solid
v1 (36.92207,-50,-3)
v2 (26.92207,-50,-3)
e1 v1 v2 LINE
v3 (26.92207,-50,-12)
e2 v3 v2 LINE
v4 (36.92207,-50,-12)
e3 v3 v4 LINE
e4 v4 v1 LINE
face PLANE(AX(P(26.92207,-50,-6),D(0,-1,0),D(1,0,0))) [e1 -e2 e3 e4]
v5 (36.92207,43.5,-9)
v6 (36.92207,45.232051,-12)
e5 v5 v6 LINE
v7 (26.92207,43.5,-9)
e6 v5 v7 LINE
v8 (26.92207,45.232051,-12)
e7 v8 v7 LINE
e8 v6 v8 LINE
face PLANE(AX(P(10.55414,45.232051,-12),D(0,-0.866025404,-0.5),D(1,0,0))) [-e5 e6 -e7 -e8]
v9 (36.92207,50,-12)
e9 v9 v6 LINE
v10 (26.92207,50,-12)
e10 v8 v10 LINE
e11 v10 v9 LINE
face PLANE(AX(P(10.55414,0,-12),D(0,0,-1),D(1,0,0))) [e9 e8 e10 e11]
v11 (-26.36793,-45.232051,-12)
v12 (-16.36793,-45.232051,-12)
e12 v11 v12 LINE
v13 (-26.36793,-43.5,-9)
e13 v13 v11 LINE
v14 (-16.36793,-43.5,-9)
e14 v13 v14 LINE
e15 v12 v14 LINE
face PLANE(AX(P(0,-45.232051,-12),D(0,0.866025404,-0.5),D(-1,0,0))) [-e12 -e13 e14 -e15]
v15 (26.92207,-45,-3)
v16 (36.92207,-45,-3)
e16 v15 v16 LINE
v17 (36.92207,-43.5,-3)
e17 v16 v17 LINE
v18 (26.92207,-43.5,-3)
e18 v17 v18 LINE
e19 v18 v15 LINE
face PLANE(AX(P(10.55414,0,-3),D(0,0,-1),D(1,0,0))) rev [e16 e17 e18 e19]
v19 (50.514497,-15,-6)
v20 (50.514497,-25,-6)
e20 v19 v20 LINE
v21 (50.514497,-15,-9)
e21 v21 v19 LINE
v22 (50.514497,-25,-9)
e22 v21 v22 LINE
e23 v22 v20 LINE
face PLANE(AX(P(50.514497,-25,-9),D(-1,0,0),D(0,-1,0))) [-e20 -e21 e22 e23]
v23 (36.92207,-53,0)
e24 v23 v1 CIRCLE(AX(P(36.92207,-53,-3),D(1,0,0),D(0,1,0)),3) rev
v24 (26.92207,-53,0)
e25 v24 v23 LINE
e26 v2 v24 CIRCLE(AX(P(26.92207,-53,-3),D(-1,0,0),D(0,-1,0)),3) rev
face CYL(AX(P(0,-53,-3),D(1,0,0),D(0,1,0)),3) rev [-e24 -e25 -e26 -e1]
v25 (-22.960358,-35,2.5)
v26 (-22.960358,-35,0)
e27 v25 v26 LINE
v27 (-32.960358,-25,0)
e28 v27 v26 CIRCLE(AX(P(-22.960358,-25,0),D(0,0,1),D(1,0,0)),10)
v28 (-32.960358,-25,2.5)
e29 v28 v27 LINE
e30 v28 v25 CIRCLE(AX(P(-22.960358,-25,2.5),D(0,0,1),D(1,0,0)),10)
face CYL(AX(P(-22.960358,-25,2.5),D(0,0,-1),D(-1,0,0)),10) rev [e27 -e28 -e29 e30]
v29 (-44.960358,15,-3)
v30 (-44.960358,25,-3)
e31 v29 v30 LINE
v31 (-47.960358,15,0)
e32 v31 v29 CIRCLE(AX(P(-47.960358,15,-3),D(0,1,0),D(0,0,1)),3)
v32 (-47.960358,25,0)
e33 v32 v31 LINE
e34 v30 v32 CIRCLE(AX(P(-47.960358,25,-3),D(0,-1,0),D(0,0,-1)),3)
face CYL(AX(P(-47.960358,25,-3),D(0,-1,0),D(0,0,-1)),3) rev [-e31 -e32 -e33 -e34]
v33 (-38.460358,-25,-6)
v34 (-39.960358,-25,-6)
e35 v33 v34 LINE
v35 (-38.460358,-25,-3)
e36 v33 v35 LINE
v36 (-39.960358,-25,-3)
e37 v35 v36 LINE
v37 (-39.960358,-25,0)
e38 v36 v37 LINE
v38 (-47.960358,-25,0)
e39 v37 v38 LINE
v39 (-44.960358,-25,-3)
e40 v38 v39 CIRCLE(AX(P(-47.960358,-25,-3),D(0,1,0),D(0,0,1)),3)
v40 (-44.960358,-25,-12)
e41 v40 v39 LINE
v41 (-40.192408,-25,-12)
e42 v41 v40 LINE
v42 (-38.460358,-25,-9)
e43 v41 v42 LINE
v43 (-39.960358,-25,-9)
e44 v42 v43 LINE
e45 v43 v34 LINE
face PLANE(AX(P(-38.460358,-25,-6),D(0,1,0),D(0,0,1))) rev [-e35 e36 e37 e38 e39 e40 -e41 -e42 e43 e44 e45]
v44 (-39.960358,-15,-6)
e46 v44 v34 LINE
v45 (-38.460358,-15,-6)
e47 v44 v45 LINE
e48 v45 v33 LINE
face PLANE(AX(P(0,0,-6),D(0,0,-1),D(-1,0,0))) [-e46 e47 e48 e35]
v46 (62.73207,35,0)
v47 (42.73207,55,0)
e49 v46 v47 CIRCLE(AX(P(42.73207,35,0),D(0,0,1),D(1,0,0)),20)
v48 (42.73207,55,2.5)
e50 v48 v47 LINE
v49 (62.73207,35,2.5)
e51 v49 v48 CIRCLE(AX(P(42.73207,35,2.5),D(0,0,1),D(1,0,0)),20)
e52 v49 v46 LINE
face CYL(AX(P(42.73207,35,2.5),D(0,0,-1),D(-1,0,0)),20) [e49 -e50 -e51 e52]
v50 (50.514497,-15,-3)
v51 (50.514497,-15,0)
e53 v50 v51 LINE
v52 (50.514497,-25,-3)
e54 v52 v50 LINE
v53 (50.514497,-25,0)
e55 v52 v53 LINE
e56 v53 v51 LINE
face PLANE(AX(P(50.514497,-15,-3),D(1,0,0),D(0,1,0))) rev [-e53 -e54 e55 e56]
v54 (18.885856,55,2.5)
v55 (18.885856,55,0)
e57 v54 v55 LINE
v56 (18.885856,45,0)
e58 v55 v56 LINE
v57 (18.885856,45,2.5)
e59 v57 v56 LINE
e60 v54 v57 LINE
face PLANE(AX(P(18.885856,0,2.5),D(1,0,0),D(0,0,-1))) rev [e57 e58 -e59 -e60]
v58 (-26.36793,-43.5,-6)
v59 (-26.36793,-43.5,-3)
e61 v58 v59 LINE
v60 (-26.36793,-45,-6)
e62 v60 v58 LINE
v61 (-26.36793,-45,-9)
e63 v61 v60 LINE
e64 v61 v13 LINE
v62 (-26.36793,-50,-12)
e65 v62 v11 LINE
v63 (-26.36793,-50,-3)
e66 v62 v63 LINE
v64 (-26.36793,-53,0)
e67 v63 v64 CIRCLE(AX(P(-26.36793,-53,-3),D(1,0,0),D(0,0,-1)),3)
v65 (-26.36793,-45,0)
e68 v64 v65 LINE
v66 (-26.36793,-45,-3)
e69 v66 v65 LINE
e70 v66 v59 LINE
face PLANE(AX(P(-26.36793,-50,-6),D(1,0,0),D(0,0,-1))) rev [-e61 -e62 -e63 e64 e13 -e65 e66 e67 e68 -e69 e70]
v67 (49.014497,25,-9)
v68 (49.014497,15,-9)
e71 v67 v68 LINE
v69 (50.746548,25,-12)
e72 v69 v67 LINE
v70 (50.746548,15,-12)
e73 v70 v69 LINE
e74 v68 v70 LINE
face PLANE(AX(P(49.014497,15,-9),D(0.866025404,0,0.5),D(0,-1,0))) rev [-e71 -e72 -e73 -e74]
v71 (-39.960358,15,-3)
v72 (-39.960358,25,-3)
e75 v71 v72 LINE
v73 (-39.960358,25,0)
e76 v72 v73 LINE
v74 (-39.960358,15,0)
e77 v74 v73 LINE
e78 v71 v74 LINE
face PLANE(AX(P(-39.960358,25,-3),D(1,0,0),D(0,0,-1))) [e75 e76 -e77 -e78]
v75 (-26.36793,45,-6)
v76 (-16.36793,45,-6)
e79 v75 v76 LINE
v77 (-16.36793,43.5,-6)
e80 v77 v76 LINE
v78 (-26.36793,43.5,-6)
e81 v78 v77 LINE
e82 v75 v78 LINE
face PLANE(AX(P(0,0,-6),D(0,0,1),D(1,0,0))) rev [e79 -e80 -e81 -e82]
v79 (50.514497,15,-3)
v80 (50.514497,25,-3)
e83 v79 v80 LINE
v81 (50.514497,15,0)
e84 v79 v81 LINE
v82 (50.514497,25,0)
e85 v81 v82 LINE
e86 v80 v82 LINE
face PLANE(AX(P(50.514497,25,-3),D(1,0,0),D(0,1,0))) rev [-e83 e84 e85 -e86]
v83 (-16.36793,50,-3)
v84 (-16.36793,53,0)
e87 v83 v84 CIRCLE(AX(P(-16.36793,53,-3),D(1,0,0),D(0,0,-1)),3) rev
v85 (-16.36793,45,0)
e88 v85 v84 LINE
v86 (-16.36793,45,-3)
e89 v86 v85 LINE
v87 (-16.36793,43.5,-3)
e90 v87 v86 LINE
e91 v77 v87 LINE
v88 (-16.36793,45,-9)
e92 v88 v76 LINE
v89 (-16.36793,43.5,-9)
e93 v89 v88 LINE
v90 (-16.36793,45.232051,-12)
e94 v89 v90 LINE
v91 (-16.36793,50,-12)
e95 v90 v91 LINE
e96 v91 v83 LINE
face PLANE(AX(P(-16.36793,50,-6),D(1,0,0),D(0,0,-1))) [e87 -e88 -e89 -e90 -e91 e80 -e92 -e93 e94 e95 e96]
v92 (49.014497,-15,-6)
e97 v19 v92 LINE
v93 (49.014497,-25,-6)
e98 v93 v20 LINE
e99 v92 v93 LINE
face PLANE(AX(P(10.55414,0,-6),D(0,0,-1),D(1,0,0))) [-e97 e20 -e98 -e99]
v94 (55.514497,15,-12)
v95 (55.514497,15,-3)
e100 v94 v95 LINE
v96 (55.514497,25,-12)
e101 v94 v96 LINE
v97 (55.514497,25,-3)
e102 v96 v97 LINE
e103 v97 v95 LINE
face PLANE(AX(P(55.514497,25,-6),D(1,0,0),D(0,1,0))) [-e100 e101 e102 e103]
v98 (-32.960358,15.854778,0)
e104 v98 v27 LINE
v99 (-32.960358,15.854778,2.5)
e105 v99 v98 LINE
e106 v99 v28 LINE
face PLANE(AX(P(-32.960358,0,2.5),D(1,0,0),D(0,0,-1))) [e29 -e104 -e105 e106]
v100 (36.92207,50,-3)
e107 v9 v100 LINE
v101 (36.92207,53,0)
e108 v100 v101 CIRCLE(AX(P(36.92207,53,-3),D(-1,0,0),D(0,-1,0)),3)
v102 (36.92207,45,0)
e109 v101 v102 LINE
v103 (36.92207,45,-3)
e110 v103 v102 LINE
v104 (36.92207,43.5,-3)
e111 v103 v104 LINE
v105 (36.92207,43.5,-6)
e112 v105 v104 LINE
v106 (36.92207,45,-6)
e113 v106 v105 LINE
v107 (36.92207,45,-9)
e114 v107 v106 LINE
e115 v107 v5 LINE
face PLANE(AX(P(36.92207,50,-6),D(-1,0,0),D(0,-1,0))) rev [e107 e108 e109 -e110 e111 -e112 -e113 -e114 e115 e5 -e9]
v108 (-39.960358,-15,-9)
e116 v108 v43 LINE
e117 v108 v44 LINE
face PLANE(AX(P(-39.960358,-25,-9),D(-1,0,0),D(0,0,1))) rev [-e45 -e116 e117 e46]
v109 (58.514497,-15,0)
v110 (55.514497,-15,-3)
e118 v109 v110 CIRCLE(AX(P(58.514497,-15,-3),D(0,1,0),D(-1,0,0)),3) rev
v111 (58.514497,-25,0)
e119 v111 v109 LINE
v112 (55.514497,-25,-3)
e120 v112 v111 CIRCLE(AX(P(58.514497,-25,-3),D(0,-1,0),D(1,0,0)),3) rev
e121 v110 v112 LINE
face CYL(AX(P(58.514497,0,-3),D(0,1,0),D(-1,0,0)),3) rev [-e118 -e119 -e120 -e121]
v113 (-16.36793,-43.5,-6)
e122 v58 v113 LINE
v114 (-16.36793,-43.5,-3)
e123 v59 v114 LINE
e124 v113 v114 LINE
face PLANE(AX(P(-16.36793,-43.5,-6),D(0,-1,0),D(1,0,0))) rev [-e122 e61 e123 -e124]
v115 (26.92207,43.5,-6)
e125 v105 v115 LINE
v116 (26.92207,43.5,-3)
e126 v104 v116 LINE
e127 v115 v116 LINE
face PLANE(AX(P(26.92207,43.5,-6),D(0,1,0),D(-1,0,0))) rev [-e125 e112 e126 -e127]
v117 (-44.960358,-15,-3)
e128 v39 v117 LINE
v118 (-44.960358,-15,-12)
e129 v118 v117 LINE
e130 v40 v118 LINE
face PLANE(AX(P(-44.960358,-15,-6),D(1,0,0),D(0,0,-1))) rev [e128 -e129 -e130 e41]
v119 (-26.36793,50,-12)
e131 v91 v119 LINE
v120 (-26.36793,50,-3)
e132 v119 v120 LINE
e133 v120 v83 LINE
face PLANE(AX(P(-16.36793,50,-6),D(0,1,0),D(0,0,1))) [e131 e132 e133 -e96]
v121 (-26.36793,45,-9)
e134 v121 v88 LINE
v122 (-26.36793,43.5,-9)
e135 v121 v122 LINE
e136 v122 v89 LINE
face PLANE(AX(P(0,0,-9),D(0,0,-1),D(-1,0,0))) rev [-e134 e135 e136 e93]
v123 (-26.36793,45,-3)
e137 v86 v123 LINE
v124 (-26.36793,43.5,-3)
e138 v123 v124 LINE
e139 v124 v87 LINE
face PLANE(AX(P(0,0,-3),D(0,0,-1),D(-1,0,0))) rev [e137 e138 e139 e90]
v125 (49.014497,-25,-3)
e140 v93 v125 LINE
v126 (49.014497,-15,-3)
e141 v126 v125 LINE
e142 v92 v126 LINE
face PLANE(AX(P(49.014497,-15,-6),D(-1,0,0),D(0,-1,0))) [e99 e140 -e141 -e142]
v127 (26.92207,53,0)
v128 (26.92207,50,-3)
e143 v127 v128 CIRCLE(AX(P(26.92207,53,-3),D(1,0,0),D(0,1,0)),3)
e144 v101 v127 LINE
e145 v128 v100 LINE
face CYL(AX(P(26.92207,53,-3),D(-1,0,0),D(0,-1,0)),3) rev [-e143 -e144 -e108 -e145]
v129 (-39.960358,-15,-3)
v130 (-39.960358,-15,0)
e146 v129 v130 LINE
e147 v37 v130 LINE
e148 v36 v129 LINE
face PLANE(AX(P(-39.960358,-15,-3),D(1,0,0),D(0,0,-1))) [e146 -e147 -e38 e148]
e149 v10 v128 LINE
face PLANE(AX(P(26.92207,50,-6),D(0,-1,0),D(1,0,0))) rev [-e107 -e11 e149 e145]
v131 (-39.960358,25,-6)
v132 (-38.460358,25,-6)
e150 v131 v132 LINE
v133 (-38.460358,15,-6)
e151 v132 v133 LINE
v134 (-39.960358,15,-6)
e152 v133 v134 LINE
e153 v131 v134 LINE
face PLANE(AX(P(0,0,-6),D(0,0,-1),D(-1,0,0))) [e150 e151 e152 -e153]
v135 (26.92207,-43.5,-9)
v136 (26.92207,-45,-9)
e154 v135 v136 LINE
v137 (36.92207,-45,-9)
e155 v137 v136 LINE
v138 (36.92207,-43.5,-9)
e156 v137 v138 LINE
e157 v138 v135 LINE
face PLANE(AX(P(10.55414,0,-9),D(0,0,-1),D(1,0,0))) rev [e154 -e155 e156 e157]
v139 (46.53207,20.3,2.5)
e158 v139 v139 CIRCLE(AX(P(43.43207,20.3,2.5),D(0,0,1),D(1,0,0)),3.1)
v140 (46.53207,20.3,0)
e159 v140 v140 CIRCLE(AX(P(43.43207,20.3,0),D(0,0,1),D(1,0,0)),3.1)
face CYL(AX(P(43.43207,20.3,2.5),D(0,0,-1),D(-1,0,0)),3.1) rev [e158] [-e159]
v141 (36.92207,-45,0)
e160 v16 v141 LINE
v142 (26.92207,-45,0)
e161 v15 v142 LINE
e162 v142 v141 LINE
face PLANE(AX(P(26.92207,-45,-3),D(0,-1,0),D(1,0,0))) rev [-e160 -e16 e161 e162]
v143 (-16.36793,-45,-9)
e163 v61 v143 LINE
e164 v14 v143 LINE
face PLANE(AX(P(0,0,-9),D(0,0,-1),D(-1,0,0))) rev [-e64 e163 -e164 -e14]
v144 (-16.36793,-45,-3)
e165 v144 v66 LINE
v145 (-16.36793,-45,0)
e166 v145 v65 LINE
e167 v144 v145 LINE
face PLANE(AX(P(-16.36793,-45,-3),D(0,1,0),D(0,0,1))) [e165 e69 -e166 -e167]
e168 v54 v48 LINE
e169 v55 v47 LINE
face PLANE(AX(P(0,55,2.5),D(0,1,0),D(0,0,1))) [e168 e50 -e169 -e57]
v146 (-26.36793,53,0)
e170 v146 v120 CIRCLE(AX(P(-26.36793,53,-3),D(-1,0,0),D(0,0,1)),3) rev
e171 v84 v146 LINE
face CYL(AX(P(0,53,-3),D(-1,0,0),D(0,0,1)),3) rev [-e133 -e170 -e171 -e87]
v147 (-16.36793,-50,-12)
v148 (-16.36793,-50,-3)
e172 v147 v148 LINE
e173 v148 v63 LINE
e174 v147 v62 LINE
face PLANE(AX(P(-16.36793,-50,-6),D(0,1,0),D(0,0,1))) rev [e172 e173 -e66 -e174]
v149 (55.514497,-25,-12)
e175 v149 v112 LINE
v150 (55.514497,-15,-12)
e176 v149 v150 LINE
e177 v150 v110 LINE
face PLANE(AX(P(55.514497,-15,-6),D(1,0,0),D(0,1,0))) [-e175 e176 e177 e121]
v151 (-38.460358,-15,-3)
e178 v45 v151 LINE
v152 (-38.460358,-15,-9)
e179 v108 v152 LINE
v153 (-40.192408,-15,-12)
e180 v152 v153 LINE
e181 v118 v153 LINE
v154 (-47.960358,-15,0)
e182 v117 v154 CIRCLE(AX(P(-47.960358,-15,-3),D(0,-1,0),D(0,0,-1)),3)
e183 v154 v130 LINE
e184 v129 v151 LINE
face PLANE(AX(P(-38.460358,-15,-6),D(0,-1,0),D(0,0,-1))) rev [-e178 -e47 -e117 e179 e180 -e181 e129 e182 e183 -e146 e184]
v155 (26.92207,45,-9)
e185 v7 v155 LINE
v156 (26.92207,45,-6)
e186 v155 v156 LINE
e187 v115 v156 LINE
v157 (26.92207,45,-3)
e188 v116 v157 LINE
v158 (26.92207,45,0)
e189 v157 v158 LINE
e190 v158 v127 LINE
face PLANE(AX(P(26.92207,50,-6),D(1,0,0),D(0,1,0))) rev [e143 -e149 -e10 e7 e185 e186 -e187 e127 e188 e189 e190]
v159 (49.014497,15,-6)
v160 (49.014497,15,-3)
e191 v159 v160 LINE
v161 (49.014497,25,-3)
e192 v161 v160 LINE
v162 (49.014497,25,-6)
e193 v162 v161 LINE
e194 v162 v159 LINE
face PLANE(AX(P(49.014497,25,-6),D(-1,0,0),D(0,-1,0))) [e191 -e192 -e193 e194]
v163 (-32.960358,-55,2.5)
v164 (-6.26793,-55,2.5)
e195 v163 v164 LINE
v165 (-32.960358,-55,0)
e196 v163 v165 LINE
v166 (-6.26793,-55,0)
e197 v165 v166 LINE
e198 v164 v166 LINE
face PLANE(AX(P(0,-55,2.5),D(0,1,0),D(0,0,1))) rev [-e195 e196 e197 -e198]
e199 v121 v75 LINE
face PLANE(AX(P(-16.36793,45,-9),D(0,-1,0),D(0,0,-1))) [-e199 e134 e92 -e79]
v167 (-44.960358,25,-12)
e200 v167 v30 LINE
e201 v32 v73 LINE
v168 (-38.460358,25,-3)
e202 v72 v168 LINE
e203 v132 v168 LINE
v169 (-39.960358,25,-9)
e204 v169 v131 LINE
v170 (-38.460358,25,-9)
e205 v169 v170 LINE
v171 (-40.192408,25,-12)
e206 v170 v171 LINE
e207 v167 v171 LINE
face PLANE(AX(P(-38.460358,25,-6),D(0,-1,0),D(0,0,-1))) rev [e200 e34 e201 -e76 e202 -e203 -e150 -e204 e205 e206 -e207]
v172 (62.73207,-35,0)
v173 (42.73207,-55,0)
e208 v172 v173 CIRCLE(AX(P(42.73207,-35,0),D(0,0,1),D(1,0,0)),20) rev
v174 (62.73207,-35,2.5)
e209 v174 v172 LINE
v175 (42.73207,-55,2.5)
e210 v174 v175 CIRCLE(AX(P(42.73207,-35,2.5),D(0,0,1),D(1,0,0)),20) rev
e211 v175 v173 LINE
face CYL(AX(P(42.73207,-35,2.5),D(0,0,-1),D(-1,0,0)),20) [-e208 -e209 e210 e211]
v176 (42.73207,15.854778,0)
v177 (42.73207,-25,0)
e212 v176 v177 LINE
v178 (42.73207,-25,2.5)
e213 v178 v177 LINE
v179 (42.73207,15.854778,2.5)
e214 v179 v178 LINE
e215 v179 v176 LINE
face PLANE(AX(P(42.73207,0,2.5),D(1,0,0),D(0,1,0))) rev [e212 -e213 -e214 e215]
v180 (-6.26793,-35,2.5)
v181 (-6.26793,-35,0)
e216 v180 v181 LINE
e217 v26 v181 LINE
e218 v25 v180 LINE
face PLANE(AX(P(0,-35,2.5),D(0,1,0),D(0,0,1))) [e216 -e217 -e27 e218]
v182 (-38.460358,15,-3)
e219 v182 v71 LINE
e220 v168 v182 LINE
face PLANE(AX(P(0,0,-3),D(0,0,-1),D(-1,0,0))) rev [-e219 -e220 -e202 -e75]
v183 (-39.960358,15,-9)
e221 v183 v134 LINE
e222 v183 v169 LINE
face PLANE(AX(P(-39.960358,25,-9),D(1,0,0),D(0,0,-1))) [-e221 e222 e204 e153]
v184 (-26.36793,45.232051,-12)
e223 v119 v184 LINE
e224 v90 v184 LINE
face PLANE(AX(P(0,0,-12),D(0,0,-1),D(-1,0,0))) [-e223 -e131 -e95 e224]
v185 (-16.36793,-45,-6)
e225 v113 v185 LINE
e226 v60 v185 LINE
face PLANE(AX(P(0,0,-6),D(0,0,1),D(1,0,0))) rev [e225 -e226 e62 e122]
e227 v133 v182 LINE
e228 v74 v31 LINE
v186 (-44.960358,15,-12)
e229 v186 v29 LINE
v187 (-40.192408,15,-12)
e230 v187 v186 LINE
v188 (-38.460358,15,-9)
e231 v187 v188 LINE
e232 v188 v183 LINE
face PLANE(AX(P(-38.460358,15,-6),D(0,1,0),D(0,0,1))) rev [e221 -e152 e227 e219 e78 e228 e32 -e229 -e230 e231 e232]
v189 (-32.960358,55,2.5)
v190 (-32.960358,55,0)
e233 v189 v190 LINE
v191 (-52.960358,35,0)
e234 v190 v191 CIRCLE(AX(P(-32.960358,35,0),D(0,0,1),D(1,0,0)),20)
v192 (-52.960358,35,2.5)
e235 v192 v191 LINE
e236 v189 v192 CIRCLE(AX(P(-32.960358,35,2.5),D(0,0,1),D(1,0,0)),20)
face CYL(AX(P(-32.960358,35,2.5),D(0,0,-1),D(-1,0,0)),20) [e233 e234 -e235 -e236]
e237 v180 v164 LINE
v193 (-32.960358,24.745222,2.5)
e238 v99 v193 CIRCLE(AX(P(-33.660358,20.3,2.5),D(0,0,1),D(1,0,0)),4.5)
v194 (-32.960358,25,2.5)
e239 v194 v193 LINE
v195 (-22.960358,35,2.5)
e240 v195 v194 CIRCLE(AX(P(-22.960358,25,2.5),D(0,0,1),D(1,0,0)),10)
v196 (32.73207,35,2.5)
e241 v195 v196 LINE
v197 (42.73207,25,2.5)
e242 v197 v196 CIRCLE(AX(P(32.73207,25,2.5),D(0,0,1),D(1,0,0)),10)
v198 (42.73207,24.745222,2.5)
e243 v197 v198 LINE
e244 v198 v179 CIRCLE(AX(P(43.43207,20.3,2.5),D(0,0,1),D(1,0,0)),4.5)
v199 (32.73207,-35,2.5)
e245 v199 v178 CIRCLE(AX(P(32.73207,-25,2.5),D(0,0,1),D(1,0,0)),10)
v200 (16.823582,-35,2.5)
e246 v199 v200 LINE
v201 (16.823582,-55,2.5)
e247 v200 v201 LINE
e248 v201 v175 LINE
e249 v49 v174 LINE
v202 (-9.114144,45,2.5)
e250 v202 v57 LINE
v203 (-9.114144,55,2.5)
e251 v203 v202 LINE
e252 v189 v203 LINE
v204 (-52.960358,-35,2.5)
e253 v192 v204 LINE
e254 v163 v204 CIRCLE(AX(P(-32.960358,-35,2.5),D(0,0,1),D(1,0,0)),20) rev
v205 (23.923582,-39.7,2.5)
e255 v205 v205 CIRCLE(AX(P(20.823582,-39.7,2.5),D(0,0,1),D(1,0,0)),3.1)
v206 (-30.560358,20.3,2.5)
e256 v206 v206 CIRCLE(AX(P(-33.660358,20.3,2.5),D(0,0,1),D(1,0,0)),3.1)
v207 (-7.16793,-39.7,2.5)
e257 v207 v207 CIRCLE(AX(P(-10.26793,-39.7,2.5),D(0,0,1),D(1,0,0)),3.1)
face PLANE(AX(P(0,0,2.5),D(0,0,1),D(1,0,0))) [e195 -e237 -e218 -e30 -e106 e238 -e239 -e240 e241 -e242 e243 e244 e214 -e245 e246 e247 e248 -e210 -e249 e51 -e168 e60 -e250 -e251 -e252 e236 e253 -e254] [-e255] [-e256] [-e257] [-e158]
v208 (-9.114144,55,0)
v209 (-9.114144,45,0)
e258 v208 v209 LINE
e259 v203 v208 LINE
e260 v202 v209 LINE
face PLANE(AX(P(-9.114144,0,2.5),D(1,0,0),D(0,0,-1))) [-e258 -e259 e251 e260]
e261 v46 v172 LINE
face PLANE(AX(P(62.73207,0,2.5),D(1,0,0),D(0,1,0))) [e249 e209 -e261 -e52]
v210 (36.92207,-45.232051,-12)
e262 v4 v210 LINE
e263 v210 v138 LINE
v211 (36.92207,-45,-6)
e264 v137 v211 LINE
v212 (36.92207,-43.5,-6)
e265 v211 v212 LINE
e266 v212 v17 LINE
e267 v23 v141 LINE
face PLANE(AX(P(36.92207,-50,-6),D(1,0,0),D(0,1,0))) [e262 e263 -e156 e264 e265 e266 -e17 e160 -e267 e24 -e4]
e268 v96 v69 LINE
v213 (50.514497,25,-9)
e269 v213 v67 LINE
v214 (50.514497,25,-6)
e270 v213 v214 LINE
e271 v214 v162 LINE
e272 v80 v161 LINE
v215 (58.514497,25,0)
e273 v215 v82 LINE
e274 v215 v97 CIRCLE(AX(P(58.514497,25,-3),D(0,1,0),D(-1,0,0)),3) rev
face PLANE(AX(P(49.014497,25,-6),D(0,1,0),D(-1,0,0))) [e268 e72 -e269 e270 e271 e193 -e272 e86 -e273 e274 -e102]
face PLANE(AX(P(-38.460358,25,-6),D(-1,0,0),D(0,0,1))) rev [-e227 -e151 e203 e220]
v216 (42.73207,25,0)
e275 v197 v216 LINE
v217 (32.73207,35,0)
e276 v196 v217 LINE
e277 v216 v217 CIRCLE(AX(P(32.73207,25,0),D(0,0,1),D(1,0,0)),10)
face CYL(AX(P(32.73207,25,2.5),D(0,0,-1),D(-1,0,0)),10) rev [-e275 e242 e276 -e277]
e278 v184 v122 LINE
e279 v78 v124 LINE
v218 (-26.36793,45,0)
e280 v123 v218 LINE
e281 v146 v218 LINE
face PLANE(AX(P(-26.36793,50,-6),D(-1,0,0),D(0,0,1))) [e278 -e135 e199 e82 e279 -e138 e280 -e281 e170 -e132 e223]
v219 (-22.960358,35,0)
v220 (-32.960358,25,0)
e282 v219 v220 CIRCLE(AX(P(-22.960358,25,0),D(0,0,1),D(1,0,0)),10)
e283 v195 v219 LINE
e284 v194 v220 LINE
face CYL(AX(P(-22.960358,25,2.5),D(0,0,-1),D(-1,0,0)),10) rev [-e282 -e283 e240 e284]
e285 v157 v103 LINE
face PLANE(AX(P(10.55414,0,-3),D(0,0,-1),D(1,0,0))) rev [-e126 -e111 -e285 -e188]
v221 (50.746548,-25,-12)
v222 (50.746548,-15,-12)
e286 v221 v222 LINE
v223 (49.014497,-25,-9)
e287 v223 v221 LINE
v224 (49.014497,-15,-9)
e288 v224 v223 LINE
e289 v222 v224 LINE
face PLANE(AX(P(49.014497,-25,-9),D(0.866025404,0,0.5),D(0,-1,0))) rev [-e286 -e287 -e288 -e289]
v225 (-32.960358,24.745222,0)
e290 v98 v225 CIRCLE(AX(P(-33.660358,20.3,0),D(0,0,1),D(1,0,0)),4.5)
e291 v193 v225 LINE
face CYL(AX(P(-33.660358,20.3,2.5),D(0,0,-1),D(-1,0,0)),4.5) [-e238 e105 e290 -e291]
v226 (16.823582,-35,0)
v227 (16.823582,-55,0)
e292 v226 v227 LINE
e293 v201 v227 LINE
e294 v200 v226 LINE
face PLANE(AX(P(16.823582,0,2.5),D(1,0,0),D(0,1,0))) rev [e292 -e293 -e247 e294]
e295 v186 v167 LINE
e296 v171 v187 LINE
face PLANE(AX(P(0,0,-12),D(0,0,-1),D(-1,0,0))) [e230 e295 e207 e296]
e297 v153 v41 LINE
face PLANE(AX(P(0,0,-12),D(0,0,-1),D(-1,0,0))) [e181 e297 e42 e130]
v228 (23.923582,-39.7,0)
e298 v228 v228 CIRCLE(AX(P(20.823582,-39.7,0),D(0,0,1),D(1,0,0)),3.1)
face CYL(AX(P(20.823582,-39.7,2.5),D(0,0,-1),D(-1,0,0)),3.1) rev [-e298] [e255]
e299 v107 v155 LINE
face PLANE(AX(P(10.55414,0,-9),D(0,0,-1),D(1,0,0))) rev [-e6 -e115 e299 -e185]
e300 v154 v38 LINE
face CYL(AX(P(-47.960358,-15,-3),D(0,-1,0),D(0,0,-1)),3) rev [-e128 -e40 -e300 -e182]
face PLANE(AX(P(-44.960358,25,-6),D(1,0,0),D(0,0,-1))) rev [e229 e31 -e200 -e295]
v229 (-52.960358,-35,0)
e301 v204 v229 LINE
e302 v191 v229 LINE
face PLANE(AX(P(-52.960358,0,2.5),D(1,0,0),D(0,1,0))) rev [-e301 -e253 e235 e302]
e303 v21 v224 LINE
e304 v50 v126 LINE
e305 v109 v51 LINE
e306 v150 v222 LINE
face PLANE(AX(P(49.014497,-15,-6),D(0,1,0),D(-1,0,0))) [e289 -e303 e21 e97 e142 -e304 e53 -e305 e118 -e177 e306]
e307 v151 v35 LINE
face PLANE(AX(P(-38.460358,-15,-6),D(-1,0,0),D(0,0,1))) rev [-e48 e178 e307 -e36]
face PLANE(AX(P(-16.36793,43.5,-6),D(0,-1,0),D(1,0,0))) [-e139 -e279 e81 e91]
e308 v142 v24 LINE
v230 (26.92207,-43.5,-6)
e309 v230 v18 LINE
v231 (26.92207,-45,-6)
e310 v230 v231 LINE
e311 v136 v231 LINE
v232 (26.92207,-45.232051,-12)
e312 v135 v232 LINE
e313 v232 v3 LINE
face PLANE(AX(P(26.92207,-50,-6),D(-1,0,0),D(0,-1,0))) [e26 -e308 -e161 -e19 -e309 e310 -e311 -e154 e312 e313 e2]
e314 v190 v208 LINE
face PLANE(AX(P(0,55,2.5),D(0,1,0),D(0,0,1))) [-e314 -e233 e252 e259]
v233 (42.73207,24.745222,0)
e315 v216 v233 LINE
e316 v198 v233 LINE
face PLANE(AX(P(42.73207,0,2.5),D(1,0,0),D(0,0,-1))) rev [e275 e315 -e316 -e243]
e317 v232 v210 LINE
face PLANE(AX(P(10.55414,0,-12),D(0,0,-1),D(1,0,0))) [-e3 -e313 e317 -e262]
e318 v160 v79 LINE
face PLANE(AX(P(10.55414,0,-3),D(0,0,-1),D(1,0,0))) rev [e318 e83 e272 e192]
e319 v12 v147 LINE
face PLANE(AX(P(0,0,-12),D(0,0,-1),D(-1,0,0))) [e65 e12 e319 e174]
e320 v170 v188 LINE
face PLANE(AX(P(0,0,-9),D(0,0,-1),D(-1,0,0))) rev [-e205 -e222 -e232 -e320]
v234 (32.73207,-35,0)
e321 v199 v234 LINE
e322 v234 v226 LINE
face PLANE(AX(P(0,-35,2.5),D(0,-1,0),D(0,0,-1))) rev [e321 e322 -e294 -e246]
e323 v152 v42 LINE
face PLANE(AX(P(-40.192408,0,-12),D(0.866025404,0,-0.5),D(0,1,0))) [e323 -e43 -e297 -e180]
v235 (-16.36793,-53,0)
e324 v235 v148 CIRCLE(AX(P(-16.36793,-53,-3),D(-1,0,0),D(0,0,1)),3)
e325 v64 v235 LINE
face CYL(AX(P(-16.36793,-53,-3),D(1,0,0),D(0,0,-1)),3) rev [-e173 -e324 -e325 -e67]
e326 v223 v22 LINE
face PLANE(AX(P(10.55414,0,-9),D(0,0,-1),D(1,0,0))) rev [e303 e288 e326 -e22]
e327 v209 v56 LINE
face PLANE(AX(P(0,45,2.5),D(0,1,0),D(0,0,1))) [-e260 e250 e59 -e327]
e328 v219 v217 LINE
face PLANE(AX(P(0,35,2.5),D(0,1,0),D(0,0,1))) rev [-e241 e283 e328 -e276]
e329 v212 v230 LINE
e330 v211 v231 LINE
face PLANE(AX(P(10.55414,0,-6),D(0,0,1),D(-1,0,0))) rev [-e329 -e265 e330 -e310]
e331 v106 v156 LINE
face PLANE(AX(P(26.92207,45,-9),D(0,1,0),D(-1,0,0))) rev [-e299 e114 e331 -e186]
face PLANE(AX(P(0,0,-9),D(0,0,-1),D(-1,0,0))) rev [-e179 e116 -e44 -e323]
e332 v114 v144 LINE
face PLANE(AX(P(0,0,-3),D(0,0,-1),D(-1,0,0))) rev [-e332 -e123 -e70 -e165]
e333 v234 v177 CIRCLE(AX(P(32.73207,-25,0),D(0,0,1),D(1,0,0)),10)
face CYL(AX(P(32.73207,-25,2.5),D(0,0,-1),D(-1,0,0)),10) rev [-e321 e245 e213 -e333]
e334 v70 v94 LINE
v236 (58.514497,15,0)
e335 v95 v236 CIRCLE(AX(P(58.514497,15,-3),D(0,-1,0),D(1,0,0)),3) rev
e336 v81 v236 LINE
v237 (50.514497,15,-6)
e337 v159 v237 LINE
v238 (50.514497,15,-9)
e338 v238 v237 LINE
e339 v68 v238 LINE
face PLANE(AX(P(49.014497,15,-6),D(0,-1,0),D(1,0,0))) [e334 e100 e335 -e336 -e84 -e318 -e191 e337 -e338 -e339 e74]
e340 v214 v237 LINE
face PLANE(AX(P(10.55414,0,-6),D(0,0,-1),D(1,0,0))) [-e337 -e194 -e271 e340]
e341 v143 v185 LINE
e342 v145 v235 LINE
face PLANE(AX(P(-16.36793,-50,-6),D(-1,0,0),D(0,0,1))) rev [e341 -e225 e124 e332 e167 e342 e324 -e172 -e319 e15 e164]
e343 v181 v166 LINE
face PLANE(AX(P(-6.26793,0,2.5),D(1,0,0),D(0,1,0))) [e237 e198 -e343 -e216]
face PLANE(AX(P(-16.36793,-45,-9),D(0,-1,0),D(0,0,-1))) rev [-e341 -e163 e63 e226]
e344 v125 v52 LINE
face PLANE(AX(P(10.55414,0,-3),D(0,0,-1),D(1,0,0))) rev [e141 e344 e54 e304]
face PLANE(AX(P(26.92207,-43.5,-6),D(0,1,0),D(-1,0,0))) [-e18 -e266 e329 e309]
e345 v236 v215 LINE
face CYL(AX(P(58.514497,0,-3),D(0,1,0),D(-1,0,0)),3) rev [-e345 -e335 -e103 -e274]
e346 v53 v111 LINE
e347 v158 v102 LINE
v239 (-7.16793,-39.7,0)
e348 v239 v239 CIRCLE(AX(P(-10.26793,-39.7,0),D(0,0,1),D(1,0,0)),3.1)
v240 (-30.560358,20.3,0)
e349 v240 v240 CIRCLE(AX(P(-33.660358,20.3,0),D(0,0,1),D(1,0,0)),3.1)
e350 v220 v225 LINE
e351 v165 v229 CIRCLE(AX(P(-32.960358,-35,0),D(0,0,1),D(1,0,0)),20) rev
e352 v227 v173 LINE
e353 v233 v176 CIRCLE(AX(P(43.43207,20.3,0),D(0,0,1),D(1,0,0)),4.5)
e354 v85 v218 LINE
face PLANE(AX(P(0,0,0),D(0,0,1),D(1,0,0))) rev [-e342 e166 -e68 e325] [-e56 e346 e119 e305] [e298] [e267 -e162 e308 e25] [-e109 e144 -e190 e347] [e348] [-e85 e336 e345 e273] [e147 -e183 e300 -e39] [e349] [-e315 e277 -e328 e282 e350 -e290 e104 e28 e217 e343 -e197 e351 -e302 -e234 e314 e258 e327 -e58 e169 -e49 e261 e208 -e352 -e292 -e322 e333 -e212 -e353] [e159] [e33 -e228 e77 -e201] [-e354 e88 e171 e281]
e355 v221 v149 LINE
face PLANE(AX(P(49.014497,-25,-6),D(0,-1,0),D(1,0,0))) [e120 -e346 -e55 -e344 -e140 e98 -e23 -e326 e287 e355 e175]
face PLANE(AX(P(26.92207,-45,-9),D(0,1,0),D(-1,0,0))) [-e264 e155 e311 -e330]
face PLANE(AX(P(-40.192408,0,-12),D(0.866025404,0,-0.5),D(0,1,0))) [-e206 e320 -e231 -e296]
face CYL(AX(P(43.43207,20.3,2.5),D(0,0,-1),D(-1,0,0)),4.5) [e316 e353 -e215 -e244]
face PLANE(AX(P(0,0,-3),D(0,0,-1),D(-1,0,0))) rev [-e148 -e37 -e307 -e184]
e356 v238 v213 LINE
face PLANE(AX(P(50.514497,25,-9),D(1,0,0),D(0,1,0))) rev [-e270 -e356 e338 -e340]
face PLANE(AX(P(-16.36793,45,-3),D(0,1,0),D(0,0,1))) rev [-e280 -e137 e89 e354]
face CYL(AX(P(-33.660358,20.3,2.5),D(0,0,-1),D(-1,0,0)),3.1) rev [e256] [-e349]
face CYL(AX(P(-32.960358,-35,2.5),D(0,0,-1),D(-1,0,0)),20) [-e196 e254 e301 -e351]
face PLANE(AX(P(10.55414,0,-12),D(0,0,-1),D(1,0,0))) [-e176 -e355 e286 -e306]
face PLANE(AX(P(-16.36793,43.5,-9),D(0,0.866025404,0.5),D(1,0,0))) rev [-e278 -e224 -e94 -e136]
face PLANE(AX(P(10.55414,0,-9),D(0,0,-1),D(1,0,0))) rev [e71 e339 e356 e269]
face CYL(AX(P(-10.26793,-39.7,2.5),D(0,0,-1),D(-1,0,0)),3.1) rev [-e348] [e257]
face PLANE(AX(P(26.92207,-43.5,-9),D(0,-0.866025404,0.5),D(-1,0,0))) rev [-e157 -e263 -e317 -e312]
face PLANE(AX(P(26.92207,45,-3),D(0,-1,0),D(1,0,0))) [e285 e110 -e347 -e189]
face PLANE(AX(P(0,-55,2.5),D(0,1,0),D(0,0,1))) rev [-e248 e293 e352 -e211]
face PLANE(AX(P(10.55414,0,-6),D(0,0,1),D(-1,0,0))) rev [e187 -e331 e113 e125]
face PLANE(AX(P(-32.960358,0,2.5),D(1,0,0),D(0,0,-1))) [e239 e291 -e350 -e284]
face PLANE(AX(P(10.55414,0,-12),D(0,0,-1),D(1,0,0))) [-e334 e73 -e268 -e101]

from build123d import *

# Parameters (mm, degrees)
CROQUIS1_R                  = 3.1
SALIENTE_EXTRUIR1_DEPTH     = 2.5
CROQUIS2_W                  = 6.5
CROQUIS2_H                  = 10
SALIENTE_EXTRUIR3_DEPTH     = 6
CROQUIS5_W                  = 1.5
CROQUIS5_H                  = 10
CORTAR_EXTRUIR2_DEPTH       = 3
SALIENTE_EXTRUIR4_START     = -3
CROQUIS6_W                  = 5
CROQUIS6_H                  = 10
SALIENTE_EXTRUIR4_DEPTH     = 4
REDONDEO1_R                 = 3
CROQUIS7_W                  = 6.5
CROQUIS7_H                  = 10
SALIENTE_EXTRUIR5_DEPTH     = 3
CHAFL_N1_SIZE2              = 3
CHAFL_N1_SIZE               = 1.732050808
CROQUIS8_W                  = 5
CROQUIS8_H                  = 10
SALIENTE_EXTRUIR6_DEPTH     = 3
CROQUIS9_W                  = 6.5
CROQUIS9_H                  = 10
SALIENTE_EXTRUIR7_DEPTH     = 3
REDONDEO2_R                 = 3
CHAFL_N2_SIZE2              = 3
CHAFL_N2_SIZE               = 1.732050808
REDONDEO1_OF_SIMETR_A1_R    = 3
CHAFL_N1_OF_SIMETR_A1_SIZE2 = 1.732050808
CHAFL_N1_OF_SIMETR_A1_SIZE  = 3
REDONDEO2_OF_SIMETR_A1_R    = 3
CHAFL_N2_OF_SIMETR_A1_SIZE2 = 1.732050808
CHAFL_N2_OF_SIMETR_A1_SIZE  = 3
CROQUIS10_W                 = 10
CROQUIS10_H                 = 6.5
SALIENTE_EXTRUIR9_DEPTH     = 6
CROQUIS12_W                 = 10
CROQUIS12_H                 = 1.5
CORTAR_EXTRUIR6_DEPTH       = 3
CROQUIS13_W                 = 10
CROQUIS13_H                 = 5
SALIENTE_EXTRUIR10_DEPTH    = 3
CROQUIS14_W                 = 10
CROQUIS14_H                 = 6.5
SALIENTE_EXTRUIR11_DEPTH    = 3
REDONDEO3_R                 = 3
CHAFL_N3_SIZE2              = 1.732050808
CHAFL_N3_SIZE               = 3
REDONDEO3_OF_SIMETR_A2_R    = 3
CHAFL_N3_OF_SIMETR_A2_SIZE2 = 3
CHAFL_N3_OF_SIMETR_A2_SIZE  = 1.732050808
SIMETR_A3_START             = 26.922069807
SIMETR_A3_DEPTH             = 10


# Read off the part's stored shape, not the designer's step: Simetría3
with BuildPart() as part:
    # Croquis1 → Saliente-Extruir1 (new body)
    with BuildSketch(Plane.XY):
        with BuildLine():
            Line((32.732069807, -35), (16.823581959, -35))
            Line((16.823581959, -35), (16.823581959, -55))
            Line((16.823581959, -55), (42.732069807, -55))
            ThreePointArc((42.732069807, -55), (56.874205431, -49.142135624), (62.732069807, -35))
            Line((62.732069807, -35), (62.732069807, 35))
            ThreePointArc((62.732069807, 35), (56.874205431, 49.142135624), (42.732069807, 55))
            Line((42.732069807, 55), (18.885856119, 55))
            Line((18.885856119, 55), (18.885856119, 45))
            Line((18.885856119, 45), (-9.114143881, 45))
            Line((-9.114143881, 45), (-9.114143881, 55))
            Line((-9.114143881, 55), (-32.96035757, 55))
            ThreePointArc((-32.96035757, 55), (-47.102493193, 49.142135624), (-52.96035757, 35))
            Line((-52.96035757, 35), (-52.96035757, -35))
            ThreePointArc((-52.96035757, -35), (-47.102493193, -49.142135624), (-32.96035757, -55))
            Line((-32.96035757, -55), (-6.267930193, -55))
            Line((-6.267930193, -55), (-6.267930193, -35))
            Line((-6.267930193, -35), (-22.96035757, -35))
            ThreePointArc((-22.96035757, -35), (-30.031425382, -32.071067812), (-32.96035757, -25))
            Line((-32.96035757, -25), (-32.96035757, 15.854777846))
            ThreePointArc((-32.96035757, 15.854777846), (-29.16035757, 20.3), (-32.96035757, 24.745222154))
            Line((-32.96035757, 24.745222154), (-32.96035757, 25))
            ThreePointArc((-32.96035757, 25), (-30.031425382, 32.071067812), (-22.96035757, 35))
            Line((-22.96035757, 35), (32.732069807, 35))
            ThreePointArc((32.732069807, 35), (39.803137619, 32.071067812), (42.732069807, 25))
            Line((42.732069807, 25), (42.732069807, 24.745222154))
            ThreePointArc((42.732069807, 24.745222154), (38.932069807, 20.3), (42.732069807, 15.854777846))
            Line((42.732069807, 15.854777846), (42.732069807, -25))
            ThreePointArc((42.732069807, -25), (39.803137619, -32.071067812), (32.732069807, -35))
        make_face()
        with Locations((20.823581959, -39.7)):
            Circle(CROQUIS1_R, mode=Mode.SUBTRACT)
        with Locations((-10.267930193, -39.7)):
            Circle(CROQUIS1_R, mode=Mode.SUBTRACT)
        with Locations((43.432069807, 20.3)):
            Circle(CROQUIS1_R, mode=Mode.SUBTRACT)
        with Locations((-33.66035757, 20.3)):
            Circle(CROQUIS1_R, mode=Mode.SUBTRACT)
    extrude(amount=SALIENTE_EXTRUIR1_DEPTH)

    # Croquis2 → Saliente-Extruir3 (add)
    with BuildSketch(Plane(origin=(0, 0, 0), x_dir=(-1, 0, 0), z_dir=(0, 0, -1))):
        with Locations((41.71035757, -20)):
            Rectangle(CROQUIS2_W, CROQUIS2_H)
        with Locations((41.71035757, 20)):
            Rectangle(CROQUIS2_W, CROQUIS2_H)
    saliente_extruir3 = extrude(amount=SALIENTE_EXTRUIR3_DEPTH)

    # Croquis5 → Cortar-Extruir2 (cut)
    with BuildSketch(Plane(origin=(0, 0, 0), x_dir=(-1, 0, 0), z_dir=(0, 0, -1))):
        with Locations((39.21035757, -20)):
            Rectangle(CROQUIS5_W, CROQUIS5_H)
        with Locations((39.21035757, 20)):
            Rectangle(CROQUIS5_W, CROQUIS5_H)
    cortar_extruir2 = extrude(amount=CORTAR_EXTRUIR2_DEPTH, mode=Mode.SUBTRACT)

    # Croquis6 → Saliente-Extruir4 (add)
    with BuildSketch(Plane(origin=(-38.46035757, 25, -6), x_dir=(1, 0, 0), z_dir=(0, 0, 1)).offset(SALIENTE_EXTRUIR4_START)):
        with Locations((-4, -5)):
            Rectangle(CROQUIS6_W, CROQUIS6_H)
    saliente_extruir4 = extrude(amount=SALIENTE_EXTRUIR4_DEPTH)

    # Redondeo1
    redondeo1_edges = [part.edges().sort_by_distance(p)[0] for p in [
        (-44.96035757, 20, 0),
    ]]
    fillet(redondeo1_edges, radius=REDONDEO1_R)

    # Croquis7 → Saliente-Extruir5 (add)
    with BuildSketch(Plane(origin=(0, 0, -9), x_dir=(-1, 0, 0), z_dir=(0, 0, -1))):
        with Locations((41.71035757, 20)):
            Rectangle(CROQUIS7_W, CROQUIS7_H)
    saliente_extruir5 = extrude(amount=SALIENTE_EXTRUIR5_DEPTH)

    # Chaflán1
    chafl_n1_edges = [part.edges().sort_by_distance(p)[0] for p in [
        (-38.46035757, 20, -12),
    ]]
    chafl_n1_side = [part.faces().sort_by_distance(p)[0] for p in [
        (-38.494998586, 20, -12),
    ]]
    chamfer(chafl_n1_edges, length=CHAFL_N1_SIZE - 0.0001, length2=CHAFL_N1_SIZE2 - 0.0001, reference=chafl_n1_side[0])  # a hair under: the kernel refuses the full size

    # Croquis8 → Saliente-Extruir6 (add)
    with BuildSketch(Plane(origin=(0, 0, -6), x_dir=(-1, 0, 0), z_dir=(0, 0, -1))):
        with Locations((42.46035757, -20)):
            Rectangle(CROQUIS8_W, CROQUIS8_H)
    saliente_extruir6 = extrude(amount=SALIENTE_EXTRUIR6_DEPTH)

    # Croquis9 → Saliente-Extruir7 (add)
    with BuildSketch(Plane(origin=(0, 0, -9), x_dir=(-1, 0, 0), z_dir=(0, 0, -1))):
        with Locations((41.71035757, -20)):
            Rectangle(CROQUIS9_W, CROQUIS9_H)
    saliente_extruir7 = extrude(amount=SALIENTE_EXTRUIR7_DEPTH)

    # Redondeo2
    redondeo2_edges = [part.edges().sort_by_distance(p)[0] for p in [
        (-44.96035757, -20, 0),
    ]]
    fillet(redondeo2_edges, radius=REDONDEO2_R)

    # Chaflán2
    chafl_n2_edges = [part.edges().sort_by_distance(p)[0] for p in [
        (-38.46035757, -20, -12),
    ]]
    chafl_n2_side = [part.faces().sort_by_distance(p)[0] for p in [
        (-38.494998586, -20, -12),
    ]]
    chamfer(chafl_n2_edges, length=CHAFL_N2_SIZE - 0.0001, length2=CHAFL_N2_SIZE2 - 0.0001, reference=chafl_n2_side[0])  # a hair under: the kernel refuses the full size

    # Simetría1: Saliente-Extruir3, Cortar-Extruir2, Saliente-Extruir4, Saliente-Extruir5, Saliente-Extruir6, Saliente-Extruir7 across plane
    add(saliente_extruir3.mirror(Plane(origin=(5.277069807, 0, 0), x_dir=(0, 0, 1), z_dir=(1, 0, 0))))
    add(cortar_extruir2.mirror(Plane(origin=(5.277069807, 0, 0), x_dir=(0, 0, 1), z_dir=(1, 0, 0))), mode=Mode.SUBTRACT)
    add(saliente_extruir4.mirror(Plane(origin=(5.277069807, 0, 0), x_dir=(0, 0, 1), z_dir=(1, 0, 0))))
    add(saliente_extruir5.mirror(Plane(origin=(5.277069807, 0, 0), x_dir=(0, 0, 1), z_dir=(1, 0, 0))))
    add(saliente_extruir6.mirror(Plane(origin=(5.277069807, 0, 0), x_dir=(0, 0, 1), z_dir=(1, 0, 0))))
    add(saliente_extruir7.mirror(Plane(origin=(5.277069807, 0, 0), x_dir=(0, 0, 1), z_dir=(1, 0, 0))))

    # Redondeo1 of Simetría1
    redondeo1_of_simetr_a1_edges = [part.edges().sort_by_distance(p)[0] for p in [
        (55.514497184, 20, 0),
    ]]
    fillet(redondeo1_of_simetr_a1_edges, radius=REDONDEO1_OF_SIMETR_A1_R)

    # Chaflán1 of Simetría1
    chafl_n1_of_simetr_a1_edges = [part.edges().sort_by_distance(p)[0] for p in [
        (49.014497184, 20, -12),
    ]]
    chafl_n1_of_simetr_a1_side = [part.faces().sort_by_distance(p)[0] for p in [
        (49.014497184, 20, -11.965358984),
    ]]
    chamfer(chafl_n1_of_simetr_a1_edges, length=CHAFL_N1_OF_SIMETR_A1_SIZE - 0.0001, length2=CHAFL_N1_OF_SIMETR_A1_SIZE2 - 0.0001, reference=chafl_n1_of_simetr_a1_side[0])  # a hair under: the kernel refuses the full size

    # Redondeo2 of Simetría1
    redondeo2_of_simetr_a1_edges = [part.edges().sort_by_distance(p)[0] for p in [
        (55.514497184, -20, 0),
    ]]
    fillet(redondeo2_of_simetr_a1_edges, radius=REDONDEO2_OF_SIMETR_A1_R)

    # Chaflán2 of Simetría1
    chafl_n2_of_simetr_a1_edges = [part.edges().sort_by_distance(p)[0] for p in [
        (49.014497184, -20, -12),
    ]]
    chafl_n2_of_simetr_a1_side = [part.faces().sort_by_distance(p)[0] for p in [
        (49.014497184, -20, -11.965358984),
    ]]
    chamfer(chafl_n2_of_simetr_a1_edges, length=CHAFL_N2_OF_SIMETR_A1_SIZE - 0.0001, length2=CHAFL_N2_OF_SIMETR_A1_SIZE2 - 0.0001, reference=chafl_n2_of_simetr_a1_side[0])  # a hair under: the kernel refuses the full size

    # Croquis10 → Saliente-Extruir9 (add)
    with BuildSketch(Plane(origin=(0, 0, 0), x_dir=(-1, 0, 0), z_dir=(0, 0, -1))):
        with Locations((21.367930193, -46.75)):
            Rectangle(CROQUIS10_W, CROQUIS10_H)
    saliente_extruir9 = extrude(amount=SALIENTE_EXTRUIR9_DEPTH)

    # Croquis12 → Cortar-Extruir6 (cut)
    with BuildSketch(Plane(origin=(0, 0, 0), x_dir=(-1, 0, 0), z_dir=(0, 0, -1))):
        with Locations((21.367930193, -44.25)):
            Rectangle(CROQUIS12_W, CROQUIS12_H)
    cortar_extruir6 = extrude(amount=CORTAR_EXTRUIR6_DEPTH, mode=Mode.SUBTRACT)

    # Croquis13 → Saliente-Extruir10 (add)
    with BuildSketch(Plane(origin=(0, 0, -6), x_dir=(-1, 0, 0), z_dir=(0, 0, -1))):
        with Locations((21.367930193, -47.5)):
            Rectangle(CROQUIS13_W, CROQUIS13_H)
    saliente_extruir10 = extrude(amount=SALIENTE_EXTRUIR10_DEPTH)

    # Croquis14 → Saliente-Extruir11 (add)
    with BuildSketch(Plane(origin=(0, 0, -9), x_dir=(-1, 0, 0), z_dir=(0, 0, -1))):
        with Locations((21.367930193, -46.75)):
            Rectangle(CROQUIS14_W, CROQUIS14_H)
    saliente_extruir11 = extrude(amount=SALIENTE_EXTRUIR11_DEPTH)

    # Redondeo3
    redondeo3_edges = [part.edges().sort_by_distance(p)[0] for p in [
        (-21.367930193, -50, 0),
    ]]
    fillet(redondeo3_edges, radius=REDONDEO3_R)

    # Chaflán3
    chafl_n3_edges = [part.edges().sort_by_distance(p)[0] for p in [
        (-21.367930193, -43.5, -12),
    ]]
    chafl_n3_side = [part.faces().sort_by_distance(p)[0] for p in [
        (-21.367930193, -43.5, -11.965358984),
    ]]
    chamfer(chafl_n3_edges, length=CHAFL_N3_SIZE - 0.0001, length2=CHAFL_N3_SIZE2 - 0.0001, reference=chafl_n3_side[0])  # a hair under: the kernel refuses the full size

    # Simetría2: Saliente-Extruir9, Cortar-Extruir6, Saliente-Extruir10, Saliente-Extruir11 across plane
    add(saliente_extruir9.mirror(Plane.ZX))
    add(cortar_extruir6.mirror(Plane.ZX), mode=Mode.SUBTRACT)
    add(saliente_extruir10.mirror(Plane.ZX))
    add(saliente_extruir11.mirror(Plane.ZX))

    # Redondeo3 of Simetría2
    redondeo3_of_simetr_a2_edges = [part.edges().sort_by_distance(p)[0] for p in [
        (-21.367930193, 50, 0),
    ]]
    fillet(redondeo3_of_simetr_a2_edges, radius=REDONDEO3_OF_SIMETR_A2_R)

    # Chaflán3 of Simetría2
    chafl_n3_of_simetr_a2_edges = [part.edges().sort_by_distance(p)[0] for p in [
        (-21.367930193, 43.5, -12),
    ]]
    chafl_n3_of_simetr_a2_side = [part.faces().sort_by_distance(p)[0] for p in [
        (-21.367930193, 43.534641016, -12),
    ]]
    chamfer(chafl_n3_of_simetr_a2_edges, length=CHAFL_N3_OF_SIMETR_A2_SIZE - 0.0001, length2=CHAFL_N3_OF_SIMETR_A2_SIZE2 - 0.0001, reference=chafl_n3_of_simetr_a2_side[0])  # a hair under: the kernel refuses the full size

    # Simetría3 outline → Simetría3 (add)
    with BuildSketch(Plane.YZ.offset(SIMETR_A3_START)):
        with BuildLine():
            Line((-45, -3), (-45, 0))
            Line((-45, 0), (-53, 0))
            ThreePointArc((-53, 0), (-50.878679656, -0.878679656), (-50, -3))
            Line((-50, -3), (-50, -12))
            Line((-50, -12), (-45.232050808, -12))
            Line((-45.232050808, -12), (-43.5, -9))
            Line((-43.5, -9), (-45, -9))
            Line((-45, -9), (-45, -6))
            Line((-45, -6), (-43.5, -6))
            Line((-43.5, -6), (-43.5, -3))
            Line((-43.5, -3), (-45, -3))
        make_face()
        with BuildLine():
            Line((43.5, -6), (45, -6))
            Line((45, -6), (45, -9))
            Line((45, -9), (43.5, -9))
            Line((43.5, -9), (45.232050808, -12))
            Line((45.232050808, -12), (50, -12))
            Line((50, -12), (50, -3))
            ThreePointArc((50, -3), (50.878679656, -0.878679656), (53, 0))
            Line((53, 0), (45, 0))
            Line((45, 0), (45, -3))
            Line((45, -3), (43.5, -3))
            Line((43.5, -3), (43.5, -6))
        make_face()
    extrude(amount=SIMETR_A3_DEPTH)


solid = part.part
